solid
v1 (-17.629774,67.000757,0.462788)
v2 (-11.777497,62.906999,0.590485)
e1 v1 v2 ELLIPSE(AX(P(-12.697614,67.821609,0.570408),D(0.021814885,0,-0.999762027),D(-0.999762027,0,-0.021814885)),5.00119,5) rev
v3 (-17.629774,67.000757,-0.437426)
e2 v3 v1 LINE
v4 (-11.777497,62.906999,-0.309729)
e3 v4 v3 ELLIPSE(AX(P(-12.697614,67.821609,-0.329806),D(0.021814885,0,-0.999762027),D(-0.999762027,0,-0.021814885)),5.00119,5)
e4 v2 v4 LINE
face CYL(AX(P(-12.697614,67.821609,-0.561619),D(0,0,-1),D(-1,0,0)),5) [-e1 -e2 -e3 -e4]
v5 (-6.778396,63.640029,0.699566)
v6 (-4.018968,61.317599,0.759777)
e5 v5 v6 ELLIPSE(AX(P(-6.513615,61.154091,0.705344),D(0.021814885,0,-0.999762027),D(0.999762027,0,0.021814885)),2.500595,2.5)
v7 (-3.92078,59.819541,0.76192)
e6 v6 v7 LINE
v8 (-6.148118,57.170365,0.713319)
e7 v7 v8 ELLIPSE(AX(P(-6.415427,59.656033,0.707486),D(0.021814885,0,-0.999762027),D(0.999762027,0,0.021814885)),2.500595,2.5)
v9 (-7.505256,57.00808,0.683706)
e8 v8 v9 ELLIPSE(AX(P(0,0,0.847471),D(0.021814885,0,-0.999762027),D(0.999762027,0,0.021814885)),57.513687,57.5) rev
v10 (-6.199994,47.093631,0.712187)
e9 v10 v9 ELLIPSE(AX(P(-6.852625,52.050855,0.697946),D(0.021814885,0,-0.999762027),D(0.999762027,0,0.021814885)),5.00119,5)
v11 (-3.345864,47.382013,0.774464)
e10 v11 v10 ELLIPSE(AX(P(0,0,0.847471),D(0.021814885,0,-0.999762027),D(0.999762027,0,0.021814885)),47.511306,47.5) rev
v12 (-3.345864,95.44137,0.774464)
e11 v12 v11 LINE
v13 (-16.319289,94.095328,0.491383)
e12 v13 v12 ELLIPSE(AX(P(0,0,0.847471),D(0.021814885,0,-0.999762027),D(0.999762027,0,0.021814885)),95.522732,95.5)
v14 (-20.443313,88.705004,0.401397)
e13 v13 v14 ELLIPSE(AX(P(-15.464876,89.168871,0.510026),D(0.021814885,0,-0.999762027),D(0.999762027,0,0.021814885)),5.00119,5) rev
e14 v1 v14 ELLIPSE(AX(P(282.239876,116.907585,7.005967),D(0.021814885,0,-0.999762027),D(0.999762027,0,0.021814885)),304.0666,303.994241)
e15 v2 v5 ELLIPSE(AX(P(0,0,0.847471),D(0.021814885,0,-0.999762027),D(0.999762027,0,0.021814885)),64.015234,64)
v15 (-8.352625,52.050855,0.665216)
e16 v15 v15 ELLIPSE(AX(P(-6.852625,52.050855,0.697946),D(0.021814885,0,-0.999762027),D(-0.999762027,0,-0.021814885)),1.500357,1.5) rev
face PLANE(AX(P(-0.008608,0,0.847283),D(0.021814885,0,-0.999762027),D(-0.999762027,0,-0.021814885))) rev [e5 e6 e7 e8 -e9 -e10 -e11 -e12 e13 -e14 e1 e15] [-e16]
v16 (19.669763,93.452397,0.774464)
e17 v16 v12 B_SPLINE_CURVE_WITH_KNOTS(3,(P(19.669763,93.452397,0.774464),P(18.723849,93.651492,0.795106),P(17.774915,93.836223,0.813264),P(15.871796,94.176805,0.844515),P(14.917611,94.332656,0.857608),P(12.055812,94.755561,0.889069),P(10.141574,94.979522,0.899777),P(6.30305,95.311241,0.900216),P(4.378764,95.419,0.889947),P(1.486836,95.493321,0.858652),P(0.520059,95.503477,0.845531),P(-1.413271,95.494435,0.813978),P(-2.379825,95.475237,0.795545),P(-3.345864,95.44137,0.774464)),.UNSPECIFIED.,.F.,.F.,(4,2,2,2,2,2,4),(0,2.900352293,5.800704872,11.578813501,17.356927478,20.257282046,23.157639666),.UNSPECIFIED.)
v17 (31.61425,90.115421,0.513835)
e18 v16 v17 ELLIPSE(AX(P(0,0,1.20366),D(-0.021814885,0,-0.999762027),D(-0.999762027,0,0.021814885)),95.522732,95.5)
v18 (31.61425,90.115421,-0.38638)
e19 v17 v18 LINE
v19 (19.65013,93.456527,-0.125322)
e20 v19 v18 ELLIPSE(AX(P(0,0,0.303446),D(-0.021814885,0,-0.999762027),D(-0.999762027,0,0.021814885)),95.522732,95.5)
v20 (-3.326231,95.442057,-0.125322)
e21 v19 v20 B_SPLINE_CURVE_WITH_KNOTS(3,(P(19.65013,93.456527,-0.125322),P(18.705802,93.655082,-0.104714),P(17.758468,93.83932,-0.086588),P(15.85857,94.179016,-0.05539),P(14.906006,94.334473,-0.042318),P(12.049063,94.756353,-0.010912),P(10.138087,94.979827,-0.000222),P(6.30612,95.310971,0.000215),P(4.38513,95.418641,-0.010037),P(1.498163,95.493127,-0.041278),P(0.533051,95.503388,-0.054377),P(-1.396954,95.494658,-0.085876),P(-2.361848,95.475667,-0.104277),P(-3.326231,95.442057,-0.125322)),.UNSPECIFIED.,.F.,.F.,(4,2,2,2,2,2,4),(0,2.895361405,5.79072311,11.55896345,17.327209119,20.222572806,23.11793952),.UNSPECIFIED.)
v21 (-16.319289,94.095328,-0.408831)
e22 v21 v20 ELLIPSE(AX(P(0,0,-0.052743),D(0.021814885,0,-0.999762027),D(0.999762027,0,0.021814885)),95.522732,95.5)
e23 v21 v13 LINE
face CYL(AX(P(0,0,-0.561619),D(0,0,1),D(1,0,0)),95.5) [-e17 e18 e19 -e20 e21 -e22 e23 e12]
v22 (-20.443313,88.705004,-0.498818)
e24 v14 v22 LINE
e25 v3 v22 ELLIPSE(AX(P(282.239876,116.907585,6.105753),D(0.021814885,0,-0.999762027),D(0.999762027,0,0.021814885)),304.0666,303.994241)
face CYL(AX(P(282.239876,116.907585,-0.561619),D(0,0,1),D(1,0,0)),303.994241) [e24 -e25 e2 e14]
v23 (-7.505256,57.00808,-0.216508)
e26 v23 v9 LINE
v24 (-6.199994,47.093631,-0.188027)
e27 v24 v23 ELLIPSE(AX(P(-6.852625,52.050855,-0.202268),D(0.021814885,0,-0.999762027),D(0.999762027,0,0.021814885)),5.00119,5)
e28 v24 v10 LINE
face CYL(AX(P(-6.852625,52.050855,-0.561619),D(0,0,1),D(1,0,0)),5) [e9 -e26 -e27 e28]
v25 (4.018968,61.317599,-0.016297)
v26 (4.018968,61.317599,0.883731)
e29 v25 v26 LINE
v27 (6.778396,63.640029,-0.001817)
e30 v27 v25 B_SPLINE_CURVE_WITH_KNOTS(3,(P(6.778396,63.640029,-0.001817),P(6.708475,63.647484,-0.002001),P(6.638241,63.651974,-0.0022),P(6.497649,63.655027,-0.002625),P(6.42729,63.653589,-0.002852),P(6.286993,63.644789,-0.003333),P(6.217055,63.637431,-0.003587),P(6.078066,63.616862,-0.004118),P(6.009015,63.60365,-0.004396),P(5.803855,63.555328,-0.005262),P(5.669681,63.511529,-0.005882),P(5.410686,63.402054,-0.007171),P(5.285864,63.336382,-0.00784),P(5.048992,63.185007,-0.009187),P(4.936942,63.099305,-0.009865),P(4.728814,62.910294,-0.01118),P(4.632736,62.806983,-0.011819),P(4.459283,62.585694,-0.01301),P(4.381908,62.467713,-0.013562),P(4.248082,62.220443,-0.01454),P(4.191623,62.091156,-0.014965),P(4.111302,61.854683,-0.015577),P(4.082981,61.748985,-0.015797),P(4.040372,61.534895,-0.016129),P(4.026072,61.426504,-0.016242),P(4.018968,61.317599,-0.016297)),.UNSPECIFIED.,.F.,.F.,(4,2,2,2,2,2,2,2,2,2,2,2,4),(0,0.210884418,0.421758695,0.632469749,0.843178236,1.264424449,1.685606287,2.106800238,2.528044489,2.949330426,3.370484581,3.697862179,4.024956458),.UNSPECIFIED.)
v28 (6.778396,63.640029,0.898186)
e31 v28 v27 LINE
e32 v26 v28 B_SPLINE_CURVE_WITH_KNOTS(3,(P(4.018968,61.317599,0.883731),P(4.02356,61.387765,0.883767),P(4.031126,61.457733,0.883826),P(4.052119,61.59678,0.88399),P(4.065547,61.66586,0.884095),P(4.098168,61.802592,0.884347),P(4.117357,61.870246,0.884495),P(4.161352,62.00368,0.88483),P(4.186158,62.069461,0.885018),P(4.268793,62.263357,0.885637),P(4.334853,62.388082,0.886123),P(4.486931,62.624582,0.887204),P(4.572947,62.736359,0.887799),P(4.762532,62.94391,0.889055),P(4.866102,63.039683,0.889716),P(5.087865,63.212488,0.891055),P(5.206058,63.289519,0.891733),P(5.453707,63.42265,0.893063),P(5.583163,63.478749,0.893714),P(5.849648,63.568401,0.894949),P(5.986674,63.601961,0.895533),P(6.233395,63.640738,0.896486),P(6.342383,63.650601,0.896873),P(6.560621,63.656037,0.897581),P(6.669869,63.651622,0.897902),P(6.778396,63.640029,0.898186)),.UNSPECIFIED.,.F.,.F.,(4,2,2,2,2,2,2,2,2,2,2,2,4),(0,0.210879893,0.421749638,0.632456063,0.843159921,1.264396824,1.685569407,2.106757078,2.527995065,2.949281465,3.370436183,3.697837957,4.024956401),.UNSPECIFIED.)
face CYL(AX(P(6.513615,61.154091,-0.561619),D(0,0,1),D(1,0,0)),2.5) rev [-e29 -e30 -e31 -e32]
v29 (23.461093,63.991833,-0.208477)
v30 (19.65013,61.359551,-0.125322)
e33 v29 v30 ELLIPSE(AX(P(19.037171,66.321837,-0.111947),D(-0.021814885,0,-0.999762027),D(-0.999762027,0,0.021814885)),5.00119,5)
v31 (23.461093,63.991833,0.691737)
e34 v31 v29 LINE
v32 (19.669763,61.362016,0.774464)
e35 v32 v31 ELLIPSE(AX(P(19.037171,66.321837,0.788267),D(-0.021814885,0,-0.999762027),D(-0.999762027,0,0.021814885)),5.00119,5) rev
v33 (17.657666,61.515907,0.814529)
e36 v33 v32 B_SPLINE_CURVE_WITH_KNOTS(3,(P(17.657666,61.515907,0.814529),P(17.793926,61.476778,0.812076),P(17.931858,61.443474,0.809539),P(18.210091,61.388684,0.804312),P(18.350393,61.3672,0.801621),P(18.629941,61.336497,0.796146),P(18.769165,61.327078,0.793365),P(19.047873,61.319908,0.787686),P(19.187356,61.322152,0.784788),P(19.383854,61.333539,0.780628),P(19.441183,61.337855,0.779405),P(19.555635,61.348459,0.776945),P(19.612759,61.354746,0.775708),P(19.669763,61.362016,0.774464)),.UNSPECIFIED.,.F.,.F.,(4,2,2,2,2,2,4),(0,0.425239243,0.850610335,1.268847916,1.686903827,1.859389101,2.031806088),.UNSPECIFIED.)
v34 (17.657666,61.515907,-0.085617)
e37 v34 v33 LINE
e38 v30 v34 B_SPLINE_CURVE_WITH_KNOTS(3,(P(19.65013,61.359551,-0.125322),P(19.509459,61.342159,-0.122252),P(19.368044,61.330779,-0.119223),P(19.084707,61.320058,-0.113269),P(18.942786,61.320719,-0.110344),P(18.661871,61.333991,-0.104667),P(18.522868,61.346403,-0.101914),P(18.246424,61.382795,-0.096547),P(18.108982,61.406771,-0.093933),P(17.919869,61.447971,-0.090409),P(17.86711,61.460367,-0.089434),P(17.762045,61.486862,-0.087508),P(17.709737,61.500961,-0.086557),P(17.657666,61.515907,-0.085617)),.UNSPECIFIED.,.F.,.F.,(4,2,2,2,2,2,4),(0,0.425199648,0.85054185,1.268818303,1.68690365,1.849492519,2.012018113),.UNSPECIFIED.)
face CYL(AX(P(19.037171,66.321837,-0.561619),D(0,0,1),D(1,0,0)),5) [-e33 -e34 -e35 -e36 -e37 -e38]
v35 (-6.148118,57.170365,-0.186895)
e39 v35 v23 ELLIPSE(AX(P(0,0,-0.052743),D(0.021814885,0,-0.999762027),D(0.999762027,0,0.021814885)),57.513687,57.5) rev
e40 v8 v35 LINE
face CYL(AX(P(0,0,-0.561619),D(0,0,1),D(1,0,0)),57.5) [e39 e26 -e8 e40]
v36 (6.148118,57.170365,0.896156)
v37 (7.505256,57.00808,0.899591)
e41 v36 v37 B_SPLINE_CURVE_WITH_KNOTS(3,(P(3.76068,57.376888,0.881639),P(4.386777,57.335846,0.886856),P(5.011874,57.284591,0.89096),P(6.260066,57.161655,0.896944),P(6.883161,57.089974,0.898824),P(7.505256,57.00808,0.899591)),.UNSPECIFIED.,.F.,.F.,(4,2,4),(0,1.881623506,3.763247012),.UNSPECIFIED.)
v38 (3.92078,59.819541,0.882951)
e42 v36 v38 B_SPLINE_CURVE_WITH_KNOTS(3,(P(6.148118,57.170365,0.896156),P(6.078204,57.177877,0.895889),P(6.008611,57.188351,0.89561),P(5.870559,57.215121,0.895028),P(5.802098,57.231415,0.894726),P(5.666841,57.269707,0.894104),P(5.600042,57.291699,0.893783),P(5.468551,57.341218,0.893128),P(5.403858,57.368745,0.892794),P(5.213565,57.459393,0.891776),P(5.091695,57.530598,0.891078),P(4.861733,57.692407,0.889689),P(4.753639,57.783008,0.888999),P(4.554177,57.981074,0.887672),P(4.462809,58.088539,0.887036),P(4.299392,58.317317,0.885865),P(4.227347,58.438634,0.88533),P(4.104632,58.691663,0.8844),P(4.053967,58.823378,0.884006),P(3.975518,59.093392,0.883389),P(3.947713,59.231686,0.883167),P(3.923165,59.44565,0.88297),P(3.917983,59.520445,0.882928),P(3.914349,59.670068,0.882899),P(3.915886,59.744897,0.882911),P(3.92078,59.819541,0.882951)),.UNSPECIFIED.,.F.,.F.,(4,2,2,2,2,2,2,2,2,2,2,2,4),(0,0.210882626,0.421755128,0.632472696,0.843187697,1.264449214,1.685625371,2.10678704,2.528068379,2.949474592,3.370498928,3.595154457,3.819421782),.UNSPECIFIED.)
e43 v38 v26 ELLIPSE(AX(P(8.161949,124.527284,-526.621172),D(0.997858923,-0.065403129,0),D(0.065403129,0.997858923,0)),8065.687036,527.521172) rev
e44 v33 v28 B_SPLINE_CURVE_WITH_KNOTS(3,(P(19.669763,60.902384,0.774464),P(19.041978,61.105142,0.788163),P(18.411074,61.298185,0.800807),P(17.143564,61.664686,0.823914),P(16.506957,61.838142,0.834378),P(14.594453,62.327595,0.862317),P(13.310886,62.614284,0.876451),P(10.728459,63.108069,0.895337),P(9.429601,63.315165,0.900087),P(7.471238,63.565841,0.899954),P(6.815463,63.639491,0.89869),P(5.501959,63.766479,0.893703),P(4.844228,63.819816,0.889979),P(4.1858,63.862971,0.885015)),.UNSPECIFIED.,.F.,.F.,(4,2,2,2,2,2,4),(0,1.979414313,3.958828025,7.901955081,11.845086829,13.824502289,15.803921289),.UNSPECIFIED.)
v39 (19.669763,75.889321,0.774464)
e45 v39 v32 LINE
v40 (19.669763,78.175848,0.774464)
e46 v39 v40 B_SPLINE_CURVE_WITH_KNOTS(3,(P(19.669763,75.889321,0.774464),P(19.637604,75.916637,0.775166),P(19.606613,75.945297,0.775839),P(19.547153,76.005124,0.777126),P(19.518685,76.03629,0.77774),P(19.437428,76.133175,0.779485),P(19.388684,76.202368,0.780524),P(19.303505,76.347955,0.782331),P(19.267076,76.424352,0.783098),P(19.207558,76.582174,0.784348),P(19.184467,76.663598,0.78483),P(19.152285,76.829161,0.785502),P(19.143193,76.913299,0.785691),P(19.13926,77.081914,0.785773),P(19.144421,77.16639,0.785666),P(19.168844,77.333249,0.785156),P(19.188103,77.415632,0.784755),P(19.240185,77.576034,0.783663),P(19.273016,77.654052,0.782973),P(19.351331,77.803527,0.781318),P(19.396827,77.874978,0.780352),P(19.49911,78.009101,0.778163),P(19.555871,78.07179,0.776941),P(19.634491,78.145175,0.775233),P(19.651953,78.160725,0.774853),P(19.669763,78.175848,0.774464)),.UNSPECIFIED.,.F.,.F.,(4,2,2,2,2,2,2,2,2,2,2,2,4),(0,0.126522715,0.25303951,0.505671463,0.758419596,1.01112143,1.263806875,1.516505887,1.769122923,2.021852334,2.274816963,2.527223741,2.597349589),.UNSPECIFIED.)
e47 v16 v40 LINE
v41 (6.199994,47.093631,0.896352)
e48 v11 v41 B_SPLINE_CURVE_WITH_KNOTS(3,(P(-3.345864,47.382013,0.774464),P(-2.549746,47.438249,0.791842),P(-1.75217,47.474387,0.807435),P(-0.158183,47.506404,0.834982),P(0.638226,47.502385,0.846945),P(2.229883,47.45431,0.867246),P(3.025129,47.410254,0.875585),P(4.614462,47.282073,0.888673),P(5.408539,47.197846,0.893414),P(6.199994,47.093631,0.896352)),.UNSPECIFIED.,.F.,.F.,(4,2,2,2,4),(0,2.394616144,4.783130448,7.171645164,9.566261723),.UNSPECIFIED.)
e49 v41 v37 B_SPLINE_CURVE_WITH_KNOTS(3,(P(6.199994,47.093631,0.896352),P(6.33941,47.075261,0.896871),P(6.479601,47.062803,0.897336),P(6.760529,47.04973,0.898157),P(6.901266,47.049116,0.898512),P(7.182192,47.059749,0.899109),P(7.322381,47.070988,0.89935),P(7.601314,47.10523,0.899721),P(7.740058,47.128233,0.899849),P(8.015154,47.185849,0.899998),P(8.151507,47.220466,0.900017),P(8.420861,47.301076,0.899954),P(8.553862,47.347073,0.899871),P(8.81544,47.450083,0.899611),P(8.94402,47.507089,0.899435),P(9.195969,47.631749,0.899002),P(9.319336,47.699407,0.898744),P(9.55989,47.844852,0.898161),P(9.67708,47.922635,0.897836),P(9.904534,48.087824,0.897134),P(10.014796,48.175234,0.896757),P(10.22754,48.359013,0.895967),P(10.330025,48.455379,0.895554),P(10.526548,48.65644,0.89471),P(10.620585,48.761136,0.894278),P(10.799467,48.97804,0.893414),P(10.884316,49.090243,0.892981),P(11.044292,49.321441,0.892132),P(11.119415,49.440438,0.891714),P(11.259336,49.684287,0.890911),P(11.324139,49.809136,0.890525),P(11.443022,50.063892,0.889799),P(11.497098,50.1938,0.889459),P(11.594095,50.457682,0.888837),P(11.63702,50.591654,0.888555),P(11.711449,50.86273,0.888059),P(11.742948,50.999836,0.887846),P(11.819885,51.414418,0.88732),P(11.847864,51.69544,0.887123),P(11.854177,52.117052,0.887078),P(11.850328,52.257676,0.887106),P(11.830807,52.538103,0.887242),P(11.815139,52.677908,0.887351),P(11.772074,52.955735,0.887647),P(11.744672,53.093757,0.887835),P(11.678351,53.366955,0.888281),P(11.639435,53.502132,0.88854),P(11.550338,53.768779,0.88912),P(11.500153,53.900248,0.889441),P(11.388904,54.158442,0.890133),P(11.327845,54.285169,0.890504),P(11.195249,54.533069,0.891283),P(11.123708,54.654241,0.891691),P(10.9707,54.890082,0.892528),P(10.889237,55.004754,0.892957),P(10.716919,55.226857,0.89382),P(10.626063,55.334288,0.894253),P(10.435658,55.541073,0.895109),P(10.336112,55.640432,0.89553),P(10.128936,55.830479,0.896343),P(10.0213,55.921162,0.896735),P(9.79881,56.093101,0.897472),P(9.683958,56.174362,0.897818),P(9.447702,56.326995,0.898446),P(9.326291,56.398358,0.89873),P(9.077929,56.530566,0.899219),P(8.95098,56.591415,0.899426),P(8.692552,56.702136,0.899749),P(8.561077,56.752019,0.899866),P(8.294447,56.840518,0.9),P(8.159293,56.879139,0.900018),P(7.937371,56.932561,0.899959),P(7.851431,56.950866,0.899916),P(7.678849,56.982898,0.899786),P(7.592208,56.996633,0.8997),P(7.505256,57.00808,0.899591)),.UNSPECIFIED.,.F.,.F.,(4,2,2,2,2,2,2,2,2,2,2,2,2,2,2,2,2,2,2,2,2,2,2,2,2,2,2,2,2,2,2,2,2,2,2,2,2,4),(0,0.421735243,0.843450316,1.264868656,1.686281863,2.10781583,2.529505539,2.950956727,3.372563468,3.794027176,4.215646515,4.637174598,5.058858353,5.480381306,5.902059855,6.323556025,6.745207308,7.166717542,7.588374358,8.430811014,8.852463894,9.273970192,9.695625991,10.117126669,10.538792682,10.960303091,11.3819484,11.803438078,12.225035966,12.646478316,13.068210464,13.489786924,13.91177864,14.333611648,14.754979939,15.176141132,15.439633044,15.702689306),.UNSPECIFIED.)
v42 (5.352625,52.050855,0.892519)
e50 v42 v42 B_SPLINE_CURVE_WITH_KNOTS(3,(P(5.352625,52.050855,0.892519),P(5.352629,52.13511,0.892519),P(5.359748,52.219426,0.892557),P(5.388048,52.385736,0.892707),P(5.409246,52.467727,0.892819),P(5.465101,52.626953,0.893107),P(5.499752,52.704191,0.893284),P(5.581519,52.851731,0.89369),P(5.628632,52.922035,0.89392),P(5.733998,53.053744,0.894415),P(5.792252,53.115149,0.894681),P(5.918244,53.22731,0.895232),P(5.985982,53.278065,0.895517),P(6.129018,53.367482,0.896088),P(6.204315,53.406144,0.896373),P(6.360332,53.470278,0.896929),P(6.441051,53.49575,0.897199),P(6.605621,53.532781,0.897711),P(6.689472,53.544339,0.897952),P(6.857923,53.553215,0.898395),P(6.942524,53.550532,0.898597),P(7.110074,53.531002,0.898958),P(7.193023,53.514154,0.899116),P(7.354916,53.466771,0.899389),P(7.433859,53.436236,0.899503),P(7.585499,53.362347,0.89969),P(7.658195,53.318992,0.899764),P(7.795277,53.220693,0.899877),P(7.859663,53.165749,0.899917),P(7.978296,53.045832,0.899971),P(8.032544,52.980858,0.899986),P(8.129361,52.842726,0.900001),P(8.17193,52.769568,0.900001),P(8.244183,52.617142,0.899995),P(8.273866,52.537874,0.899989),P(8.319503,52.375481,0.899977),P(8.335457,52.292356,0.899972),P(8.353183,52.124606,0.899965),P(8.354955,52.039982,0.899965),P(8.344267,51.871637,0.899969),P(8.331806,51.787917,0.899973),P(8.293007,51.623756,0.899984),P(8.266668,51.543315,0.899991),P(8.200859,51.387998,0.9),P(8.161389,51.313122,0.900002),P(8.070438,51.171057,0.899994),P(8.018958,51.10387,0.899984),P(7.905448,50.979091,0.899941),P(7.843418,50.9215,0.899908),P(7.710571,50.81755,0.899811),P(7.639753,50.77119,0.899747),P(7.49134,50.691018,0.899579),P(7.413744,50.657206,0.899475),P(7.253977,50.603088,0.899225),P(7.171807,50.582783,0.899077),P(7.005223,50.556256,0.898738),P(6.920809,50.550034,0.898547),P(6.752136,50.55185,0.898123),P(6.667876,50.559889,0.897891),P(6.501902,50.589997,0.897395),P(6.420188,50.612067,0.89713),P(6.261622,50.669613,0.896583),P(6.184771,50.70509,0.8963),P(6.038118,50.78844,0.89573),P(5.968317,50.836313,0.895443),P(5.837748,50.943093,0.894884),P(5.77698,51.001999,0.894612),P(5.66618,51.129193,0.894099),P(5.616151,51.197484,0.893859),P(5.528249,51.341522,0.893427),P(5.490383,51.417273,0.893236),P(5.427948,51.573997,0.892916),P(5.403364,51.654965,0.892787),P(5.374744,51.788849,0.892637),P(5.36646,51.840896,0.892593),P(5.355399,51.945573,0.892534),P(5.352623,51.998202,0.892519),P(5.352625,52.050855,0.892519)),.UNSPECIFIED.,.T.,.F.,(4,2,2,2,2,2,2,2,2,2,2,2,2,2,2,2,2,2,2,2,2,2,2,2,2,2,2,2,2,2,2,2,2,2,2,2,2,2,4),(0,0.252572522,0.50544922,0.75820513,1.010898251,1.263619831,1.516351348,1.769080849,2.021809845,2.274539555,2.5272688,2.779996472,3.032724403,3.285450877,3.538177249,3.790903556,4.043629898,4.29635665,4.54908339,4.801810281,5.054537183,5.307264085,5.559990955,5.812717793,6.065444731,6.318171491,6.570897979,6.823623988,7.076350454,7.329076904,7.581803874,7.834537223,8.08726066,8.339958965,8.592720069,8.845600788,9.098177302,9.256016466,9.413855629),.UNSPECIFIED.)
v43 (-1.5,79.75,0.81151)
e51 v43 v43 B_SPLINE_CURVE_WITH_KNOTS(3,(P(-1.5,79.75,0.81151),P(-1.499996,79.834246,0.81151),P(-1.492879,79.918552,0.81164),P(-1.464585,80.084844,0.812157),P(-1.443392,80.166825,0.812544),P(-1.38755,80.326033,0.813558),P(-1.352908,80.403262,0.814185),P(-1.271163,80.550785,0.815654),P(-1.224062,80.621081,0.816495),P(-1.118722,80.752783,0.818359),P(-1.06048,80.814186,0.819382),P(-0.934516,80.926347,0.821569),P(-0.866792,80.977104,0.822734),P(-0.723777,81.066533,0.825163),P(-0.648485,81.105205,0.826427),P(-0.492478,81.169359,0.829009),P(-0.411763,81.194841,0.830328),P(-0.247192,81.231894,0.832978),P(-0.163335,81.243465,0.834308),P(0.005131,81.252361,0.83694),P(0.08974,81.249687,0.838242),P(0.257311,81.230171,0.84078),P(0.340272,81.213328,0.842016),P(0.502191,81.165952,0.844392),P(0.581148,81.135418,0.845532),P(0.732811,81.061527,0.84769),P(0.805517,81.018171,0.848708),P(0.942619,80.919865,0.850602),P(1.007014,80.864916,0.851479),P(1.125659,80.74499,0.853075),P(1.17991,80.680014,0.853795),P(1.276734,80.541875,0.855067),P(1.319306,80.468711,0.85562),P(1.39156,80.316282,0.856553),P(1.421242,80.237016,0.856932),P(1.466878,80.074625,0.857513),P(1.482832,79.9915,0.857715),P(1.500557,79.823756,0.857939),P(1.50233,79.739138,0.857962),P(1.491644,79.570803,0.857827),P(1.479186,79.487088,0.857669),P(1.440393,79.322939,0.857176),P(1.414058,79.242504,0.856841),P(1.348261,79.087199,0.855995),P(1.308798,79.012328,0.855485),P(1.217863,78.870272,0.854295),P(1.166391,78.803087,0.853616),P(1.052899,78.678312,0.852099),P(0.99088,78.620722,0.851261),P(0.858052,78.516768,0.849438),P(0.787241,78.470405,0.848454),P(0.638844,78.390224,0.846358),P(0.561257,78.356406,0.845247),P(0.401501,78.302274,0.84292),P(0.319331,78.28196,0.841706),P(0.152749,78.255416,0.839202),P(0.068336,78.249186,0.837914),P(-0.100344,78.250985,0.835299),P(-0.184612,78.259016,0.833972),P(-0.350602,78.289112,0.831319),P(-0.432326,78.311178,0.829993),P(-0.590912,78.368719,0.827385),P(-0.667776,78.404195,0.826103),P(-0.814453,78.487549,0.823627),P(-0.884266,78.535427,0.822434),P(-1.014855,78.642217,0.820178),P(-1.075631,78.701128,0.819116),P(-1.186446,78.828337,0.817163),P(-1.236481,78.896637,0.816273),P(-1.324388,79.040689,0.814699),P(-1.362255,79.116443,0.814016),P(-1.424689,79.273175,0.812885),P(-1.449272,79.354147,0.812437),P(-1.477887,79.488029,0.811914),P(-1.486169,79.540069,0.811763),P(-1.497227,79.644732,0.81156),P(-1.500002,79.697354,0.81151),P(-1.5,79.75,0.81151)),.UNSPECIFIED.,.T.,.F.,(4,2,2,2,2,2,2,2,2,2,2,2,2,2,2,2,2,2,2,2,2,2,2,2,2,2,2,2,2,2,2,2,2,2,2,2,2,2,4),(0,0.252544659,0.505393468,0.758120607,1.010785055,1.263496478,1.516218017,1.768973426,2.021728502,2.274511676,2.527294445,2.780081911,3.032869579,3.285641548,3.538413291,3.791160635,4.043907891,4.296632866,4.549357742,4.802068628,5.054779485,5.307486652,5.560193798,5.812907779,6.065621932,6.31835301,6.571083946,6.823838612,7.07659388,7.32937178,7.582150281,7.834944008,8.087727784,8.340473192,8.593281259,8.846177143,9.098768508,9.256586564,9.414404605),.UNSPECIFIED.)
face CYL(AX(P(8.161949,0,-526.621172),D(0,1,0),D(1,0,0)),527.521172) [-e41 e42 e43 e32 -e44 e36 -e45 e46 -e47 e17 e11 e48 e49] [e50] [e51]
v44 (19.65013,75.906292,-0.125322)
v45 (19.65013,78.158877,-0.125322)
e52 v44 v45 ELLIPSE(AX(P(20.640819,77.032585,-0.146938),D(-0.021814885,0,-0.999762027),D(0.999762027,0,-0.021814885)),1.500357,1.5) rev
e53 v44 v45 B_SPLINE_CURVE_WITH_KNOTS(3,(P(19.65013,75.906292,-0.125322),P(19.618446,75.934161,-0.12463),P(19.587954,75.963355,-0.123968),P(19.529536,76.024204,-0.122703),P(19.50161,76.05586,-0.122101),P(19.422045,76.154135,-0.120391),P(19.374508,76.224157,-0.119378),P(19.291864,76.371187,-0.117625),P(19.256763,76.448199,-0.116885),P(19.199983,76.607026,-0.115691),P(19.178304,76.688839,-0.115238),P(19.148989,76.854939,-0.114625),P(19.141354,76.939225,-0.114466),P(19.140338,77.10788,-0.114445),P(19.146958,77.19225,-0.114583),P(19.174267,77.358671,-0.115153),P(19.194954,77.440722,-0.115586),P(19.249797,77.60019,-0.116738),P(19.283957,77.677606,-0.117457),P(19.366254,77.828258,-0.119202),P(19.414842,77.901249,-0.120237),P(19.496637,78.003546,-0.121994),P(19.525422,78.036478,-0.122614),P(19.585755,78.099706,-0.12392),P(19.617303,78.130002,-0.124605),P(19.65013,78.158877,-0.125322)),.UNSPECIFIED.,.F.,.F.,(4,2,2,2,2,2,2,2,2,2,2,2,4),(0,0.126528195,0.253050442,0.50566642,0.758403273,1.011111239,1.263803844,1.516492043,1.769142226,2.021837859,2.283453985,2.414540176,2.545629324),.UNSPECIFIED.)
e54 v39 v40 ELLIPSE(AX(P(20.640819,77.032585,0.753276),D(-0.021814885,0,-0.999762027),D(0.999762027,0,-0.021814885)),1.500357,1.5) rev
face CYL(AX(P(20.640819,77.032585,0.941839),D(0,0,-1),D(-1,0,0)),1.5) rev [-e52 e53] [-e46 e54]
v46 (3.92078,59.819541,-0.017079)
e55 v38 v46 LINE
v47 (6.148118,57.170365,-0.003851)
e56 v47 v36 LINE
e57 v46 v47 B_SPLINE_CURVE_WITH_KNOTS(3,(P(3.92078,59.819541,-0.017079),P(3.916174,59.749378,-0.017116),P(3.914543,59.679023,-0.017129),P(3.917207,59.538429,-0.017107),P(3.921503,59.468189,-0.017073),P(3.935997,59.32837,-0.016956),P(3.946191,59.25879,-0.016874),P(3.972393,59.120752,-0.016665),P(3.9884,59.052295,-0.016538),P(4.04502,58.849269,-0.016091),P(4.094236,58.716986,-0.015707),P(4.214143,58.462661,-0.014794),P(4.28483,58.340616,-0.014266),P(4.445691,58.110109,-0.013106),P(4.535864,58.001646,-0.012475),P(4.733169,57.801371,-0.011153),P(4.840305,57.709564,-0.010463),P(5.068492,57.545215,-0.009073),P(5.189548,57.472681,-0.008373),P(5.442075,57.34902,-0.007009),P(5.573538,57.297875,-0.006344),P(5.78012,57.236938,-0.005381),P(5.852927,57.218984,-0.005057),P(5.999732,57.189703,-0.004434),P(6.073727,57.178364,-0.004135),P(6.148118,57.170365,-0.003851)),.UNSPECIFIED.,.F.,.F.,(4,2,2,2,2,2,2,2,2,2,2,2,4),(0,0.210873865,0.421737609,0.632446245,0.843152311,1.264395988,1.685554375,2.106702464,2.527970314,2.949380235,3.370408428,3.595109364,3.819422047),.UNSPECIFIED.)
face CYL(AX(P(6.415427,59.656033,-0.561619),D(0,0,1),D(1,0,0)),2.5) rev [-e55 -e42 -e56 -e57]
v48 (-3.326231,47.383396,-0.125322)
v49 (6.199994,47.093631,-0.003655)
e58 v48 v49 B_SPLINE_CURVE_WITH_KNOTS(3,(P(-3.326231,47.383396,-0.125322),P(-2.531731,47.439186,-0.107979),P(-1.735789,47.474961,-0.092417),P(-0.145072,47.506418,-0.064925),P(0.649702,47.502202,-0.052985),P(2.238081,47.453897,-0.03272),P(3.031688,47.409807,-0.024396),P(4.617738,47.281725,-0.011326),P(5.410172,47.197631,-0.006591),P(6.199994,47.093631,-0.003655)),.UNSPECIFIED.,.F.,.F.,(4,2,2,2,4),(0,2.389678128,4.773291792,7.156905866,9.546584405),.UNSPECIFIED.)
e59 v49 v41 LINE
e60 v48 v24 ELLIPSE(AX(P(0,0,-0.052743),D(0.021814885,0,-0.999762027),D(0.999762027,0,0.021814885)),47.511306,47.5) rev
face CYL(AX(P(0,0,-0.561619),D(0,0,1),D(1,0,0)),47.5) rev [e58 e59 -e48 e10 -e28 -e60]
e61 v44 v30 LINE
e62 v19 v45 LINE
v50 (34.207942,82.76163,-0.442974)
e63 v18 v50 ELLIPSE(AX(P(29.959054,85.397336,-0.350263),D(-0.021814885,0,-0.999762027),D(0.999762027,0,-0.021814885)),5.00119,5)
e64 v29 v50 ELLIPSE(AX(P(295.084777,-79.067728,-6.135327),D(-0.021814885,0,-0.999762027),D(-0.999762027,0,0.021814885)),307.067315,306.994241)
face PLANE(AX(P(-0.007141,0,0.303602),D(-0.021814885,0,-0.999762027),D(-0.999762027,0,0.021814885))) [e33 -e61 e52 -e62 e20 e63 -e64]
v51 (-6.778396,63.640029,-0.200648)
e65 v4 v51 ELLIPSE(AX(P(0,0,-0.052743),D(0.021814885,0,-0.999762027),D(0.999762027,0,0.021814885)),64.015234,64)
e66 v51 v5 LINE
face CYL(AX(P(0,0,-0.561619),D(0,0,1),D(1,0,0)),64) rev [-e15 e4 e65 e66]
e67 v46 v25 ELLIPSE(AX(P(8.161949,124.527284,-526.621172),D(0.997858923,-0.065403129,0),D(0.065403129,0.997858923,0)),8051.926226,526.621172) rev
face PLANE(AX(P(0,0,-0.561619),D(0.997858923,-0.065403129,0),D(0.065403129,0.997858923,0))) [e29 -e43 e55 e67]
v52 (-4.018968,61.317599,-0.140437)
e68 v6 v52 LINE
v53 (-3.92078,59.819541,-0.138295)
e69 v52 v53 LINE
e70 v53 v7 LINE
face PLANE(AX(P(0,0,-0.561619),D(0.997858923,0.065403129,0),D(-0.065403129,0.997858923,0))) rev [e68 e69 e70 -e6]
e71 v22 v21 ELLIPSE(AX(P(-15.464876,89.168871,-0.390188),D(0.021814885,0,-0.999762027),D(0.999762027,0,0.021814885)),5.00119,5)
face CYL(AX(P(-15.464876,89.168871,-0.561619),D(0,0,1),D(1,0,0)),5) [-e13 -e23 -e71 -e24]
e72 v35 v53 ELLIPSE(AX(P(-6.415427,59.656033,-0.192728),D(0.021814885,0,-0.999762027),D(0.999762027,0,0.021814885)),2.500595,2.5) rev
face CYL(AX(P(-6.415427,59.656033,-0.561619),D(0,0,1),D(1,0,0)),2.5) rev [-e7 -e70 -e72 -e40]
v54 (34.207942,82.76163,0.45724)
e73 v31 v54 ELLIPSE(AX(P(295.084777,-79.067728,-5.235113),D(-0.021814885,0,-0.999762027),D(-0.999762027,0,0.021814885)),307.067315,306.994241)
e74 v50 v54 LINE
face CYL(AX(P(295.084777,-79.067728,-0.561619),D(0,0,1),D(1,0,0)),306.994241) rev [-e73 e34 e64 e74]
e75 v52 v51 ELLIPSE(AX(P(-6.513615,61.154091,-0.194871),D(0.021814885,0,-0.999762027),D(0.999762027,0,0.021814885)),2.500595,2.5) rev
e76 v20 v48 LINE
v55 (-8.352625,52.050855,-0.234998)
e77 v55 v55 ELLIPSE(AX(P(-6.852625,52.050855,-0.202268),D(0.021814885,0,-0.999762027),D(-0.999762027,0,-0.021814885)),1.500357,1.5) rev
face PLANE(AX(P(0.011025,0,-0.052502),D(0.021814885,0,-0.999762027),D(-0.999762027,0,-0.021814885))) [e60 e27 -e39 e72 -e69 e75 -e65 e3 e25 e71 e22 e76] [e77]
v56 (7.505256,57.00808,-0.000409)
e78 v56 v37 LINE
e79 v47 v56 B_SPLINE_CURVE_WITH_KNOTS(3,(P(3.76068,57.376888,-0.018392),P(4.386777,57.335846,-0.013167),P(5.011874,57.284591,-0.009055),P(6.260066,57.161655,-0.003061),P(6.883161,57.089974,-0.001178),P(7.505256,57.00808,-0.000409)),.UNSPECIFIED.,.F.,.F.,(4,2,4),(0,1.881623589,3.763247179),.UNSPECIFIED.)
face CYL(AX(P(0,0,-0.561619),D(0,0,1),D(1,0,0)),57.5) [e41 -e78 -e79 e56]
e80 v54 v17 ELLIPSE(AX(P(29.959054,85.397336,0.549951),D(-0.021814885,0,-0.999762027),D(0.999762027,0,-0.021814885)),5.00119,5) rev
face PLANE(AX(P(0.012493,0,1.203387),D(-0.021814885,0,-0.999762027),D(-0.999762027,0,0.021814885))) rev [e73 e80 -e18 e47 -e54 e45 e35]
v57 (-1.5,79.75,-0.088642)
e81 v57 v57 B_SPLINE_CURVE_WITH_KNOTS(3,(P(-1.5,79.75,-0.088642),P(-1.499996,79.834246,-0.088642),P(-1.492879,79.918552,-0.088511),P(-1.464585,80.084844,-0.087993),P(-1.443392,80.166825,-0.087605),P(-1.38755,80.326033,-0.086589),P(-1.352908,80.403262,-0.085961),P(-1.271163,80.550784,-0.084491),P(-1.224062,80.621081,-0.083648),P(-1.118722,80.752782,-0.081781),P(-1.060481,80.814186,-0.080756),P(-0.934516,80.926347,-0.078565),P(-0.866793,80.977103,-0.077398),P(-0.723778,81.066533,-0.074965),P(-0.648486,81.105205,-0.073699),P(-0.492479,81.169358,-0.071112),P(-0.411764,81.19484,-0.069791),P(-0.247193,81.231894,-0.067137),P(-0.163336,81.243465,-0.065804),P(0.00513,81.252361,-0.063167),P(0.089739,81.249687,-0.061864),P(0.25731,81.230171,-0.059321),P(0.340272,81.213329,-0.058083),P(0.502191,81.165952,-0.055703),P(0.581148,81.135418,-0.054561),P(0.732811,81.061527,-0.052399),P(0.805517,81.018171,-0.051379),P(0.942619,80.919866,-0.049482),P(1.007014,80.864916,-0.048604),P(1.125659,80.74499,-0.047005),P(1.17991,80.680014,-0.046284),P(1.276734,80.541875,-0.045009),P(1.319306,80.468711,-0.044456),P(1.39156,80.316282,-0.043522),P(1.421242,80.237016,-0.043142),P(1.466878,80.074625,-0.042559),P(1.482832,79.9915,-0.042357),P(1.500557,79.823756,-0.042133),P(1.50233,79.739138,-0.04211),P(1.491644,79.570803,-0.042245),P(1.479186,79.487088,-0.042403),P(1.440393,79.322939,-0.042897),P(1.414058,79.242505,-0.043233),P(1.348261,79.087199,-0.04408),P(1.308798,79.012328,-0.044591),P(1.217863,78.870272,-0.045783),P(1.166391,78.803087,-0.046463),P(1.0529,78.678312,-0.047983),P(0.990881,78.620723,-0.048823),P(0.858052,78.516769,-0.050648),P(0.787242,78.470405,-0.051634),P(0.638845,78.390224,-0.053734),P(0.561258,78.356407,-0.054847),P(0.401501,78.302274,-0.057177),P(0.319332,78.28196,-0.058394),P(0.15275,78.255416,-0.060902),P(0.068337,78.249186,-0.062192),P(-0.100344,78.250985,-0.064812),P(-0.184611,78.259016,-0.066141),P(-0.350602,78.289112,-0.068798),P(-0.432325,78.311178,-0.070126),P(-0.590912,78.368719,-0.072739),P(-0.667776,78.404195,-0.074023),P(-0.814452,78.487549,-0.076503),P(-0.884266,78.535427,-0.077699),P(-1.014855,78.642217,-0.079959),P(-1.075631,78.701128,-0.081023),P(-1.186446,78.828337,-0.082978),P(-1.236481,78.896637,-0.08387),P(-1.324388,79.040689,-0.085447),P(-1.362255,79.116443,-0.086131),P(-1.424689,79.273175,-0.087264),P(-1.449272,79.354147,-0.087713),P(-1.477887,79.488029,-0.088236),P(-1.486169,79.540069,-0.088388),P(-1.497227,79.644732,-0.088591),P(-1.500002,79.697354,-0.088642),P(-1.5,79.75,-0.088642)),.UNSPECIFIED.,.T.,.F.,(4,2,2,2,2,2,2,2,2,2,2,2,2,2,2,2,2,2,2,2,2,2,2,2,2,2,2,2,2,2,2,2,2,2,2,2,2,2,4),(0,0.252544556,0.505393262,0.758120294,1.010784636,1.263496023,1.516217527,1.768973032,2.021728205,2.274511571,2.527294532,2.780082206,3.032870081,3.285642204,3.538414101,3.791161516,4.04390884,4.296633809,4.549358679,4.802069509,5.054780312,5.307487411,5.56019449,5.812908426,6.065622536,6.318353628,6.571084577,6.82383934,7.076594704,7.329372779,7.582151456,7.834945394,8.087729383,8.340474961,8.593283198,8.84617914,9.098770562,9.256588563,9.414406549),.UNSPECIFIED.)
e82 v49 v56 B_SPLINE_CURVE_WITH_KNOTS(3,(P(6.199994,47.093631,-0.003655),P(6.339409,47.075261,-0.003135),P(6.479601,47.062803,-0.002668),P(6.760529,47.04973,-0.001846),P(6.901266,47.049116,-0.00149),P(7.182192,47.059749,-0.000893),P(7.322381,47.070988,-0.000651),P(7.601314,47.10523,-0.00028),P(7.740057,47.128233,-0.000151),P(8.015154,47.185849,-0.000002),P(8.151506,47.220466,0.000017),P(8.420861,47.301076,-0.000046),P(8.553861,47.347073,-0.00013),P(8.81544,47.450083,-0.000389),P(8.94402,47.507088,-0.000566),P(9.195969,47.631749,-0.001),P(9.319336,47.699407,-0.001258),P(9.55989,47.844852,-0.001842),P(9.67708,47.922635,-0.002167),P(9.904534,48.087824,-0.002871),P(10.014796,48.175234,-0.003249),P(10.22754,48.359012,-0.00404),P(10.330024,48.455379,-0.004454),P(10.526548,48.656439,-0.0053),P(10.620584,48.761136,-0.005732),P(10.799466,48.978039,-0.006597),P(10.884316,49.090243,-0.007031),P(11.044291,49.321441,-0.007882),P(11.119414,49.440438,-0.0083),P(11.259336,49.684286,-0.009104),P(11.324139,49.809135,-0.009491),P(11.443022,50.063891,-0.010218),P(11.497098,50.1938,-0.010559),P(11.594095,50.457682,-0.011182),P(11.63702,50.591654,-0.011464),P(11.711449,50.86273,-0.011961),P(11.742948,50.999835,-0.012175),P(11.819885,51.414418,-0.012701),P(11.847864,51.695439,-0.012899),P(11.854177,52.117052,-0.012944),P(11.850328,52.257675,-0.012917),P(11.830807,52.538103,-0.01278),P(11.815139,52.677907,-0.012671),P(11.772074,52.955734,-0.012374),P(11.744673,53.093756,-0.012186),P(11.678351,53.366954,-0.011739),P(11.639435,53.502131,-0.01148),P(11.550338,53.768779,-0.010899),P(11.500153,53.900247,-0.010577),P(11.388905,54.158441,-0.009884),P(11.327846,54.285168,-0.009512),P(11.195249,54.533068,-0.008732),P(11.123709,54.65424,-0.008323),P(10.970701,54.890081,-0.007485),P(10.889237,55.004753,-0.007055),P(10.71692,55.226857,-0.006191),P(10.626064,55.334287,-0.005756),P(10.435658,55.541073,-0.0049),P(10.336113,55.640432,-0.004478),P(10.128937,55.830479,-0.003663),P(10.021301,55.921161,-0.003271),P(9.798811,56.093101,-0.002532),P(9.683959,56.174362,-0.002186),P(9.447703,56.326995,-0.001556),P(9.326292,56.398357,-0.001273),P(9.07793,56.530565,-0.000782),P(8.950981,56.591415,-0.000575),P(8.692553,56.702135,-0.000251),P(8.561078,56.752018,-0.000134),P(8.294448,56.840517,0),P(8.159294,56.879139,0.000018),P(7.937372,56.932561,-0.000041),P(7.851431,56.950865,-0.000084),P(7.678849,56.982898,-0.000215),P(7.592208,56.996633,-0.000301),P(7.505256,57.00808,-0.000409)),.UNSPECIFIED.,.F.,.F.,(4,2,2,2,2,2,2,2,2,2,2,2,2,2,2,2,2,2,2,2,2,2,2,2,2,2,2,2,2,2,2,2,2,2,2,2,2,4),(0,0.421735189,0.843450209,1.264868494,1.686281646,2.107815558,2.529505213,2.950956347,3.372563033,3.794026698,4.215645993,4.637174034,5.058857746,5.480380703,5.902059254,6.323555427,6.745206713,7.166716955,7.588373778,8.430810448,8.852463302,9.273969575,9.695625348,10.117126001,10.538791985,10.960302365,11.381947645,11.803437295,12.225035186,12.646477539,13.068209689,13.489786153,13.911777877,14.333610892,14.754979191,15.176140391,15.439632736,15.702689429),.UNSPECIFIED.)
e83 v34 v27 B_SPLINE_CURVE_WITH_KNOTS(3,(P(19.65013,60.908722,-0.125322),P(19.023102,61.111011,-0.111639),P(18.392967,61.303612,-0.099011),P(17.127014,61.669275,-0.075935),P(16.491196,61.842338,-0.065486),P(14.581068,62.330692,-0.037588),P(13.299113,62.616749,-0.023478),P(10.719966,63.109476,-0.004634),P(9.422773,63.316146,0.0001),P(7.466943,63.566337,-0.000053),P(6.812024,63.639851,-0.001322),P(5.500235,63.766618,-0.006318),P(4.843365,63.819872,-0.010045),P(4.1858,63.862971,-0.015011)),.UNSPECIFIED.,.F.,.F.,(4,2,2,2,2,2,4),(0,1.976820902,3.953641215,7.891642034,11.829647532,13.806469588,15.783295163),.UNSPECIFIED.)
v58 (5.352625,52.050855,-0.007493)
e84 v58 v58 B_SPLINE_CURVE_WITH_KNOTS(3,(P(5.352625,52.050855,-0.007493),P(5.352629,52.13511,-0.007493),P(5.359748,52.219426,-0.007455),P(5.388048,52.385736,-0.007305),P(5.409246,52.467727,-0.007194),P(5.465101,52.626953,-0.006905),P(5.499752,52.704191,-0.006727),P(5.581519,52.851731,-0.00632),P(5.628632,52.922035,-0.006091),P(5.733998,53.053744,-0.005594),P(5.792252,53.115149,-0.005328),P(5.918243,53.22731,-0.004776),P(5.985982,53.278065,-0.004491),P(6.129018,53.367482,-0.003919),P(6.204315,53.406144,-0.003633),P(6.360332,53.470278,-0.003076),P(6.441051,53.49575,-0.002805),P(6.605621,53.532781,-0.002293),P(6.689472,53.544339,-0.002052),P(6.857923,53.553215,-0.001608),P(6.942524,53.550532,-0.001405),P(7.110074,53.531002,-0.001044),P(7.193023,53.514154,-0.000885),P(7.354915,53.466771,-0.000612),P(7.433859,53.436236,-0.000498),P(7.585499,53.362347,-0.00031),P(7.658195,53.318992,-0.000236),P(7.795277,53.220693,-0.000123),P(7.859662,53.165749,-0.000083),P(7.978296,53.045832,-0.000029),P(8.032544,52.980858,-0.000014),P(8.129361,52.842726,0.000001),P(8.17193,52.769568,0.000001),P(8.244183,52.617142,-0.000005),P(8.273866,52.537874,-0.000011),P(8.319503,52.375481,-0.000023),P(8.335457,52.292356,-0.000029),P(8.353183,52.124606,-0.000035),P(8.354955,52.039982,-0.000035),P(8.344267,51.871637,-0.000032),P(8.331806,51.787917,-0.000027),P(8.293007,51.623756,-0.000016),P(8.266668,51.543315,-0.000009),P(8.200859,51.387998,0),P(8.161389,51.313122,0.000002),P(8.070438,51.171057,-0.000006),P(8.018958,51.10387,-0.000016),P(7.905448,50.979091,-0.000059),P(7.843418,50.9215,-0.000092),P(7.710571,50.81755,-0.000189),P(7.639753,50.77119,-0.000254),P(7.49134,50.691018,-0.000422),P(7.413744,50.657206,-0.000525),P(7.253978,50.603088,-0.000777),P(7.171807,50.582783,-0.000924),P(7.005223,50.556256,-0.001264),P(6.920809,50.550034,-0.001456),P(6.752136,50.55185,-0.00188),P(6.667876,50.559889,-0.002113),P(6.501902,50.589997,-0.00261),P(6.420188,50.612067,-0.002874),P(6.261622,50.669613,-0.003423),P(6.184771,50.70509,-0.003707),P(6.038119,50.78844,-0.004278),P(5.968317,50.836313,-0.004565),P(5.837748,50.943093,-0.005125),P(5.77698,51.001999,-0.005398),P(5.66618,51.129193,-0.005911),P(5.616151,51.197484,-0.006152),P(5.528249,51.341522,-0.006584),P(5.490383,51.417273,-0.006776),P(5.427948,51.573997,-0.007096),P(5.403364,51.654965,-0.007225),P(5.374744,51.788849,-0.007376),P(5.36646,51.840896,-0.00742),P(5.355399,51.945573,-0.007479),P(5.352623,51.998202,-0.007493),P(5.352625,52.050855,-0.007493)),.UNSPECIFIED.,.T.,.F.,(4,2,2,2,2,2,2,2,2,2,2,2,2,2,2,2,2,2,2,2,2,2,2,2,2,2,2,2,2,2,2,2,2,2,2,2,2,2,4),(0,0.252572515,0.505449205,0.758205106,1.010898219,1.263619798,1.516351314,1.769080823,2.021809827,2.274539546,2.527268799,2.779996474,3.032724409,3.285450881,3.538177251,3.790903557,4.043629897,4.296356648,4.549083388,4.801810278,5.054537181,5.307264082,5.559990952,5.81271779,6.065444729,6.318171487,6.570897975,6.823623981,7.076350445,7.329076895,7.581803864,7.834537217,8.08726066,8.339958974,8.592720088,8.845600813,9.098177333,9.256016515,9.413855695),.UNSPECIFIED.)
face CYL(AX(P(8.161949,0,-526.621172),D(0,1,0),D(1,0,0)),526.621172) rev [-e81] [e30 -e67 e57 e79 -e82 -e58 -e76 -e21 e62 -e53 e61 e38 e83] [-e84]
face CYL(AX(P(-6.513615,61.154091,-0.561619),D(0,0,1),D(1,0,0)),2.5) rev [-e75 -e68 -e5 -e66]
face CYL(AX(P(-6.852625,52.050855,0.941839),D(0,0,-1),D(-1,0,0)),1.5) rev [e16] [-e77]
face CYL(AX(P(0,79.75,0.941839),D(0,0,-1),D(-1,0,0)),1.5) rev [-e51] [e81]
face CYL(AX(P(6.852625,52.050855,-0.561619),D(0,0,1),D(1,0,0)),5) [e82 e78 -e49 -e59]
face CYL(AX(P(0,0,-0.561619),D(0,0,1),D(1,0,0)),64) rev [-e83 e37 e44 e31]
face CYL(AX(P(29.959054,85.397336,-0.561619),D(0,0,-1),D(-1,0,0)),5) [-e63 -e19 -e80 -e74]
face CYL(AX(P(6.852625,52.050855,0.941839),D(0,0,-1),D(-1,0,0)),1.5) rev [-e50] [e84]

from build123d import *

# Parameters (mm, degrees)
SKETCH9_W               = 63
SKETCH9_H               = 97
BOSS_EXTRUDE3_DEPTH     = 0.9
FLEX1_DEPTH             = 97
FLEX1_2_DEPTH           = 97
HOLES_DEPTH             = 105.800393682
HOLES_DEPTH_BACK        = 105.800393682
SKETCH10_R              = 1.5
CUT_EXTRUDE2_DEPTH      = 105.800393775
CUT_EXTRUDE2_DEPTH_BACK = 105.800393775
SKETCH11_W              = 63.006108503
SKETCH11_H              = 97
FILLET1_START           = -0.513450093
FILLET1_DEPTH           = 1.413450171
FILLET2_R               = 2.5


with BuildPart() as part:
    # Sketch9 → Boss-Extrude3 (new body)
    with BuildSketch(Plane.XY):
        with Locations((8.161949416, 48.5)):
            Rectangle(SKETCH9_W, SKETCH9_H)
    extrude(amount=BOSS_EXTRUDE3_DEPTH)

    # Flex1: read off the stored shape, not the designer's step
    # Flex1 outline → Flex1 (cut)
    with BuildSketch(Plane(origin=(0, 0, 0), x_dir=(1, 0, 0), z_dir=(0, 1, 0))):
        Polygon((39.661949416, 0), (39.657624847, 0), (39.661949416, -0.1981922), align=None)
        Polygon((-23.338050584, -0.198192162), (-23.333726016, 0), (-23.338050584, 0), align=None)
        with BuildLine():
            Line((39.661949416, -0.9), (39.661949416, -0.33823319))
            Line((39.661949416, -0.33823319), (19.669763126, -0.774464246))
            ThreePointArc((19.669763126, -0.774464246), (13.91619862, -0.868615128), (8.161949416, -0.9))
            Line((8.161949416, -0.9), (39.661949416, -0.9))
        make_face()
        with BuildLine():
            Line((-3.345864294, -0.774464246), (-23.338050584, -0.33823319))
            Line((-23.338050584, -0.33823319), (-23.338050584, -0.9))
            Line((-23.338050584, -0.9), (8.161949416, -0.9))
            ThreePointArc((8.161949416, -0.9), (2.407700212, -0.868615128), (-3.345864294, -0.774464246))
        make_face()
    extrude(amount=FLEX1_DEPTH, mode=Mode.SUBTRACT)

    # Flex1 2 outline → Flex1 2 (add)
    with BuildSketch(Plane(origin=(0, 0, 0), x_dir=(1, 0, 0), z_dir=(0, 1, 0))):
        with BuildLine():
            ThreePointArc((8.161950743, 0), (2.417518157, 0.031331319), (-3.326230898, 0.125321578))
            Line((-3.326230898, 0.125321578), (-23.321471439, 0.561619279))
            Line((-23.321471439, 0.561619279), (-23.333726016, 0))
            Line((-23.333726016, 0), (8.161950743, 0))
        make_face()
        with BuildLine():
            ThreePointArc((19.650129729, 0.125321578), (13.906382001, 0.031331334), (8.161950743, 0))
            Line((8.161950743, 0), (39.657624847, 0))
            Line((39.657624847, 0), (39.645370271, 0.561619279))
            Line((39.645370271, 0.561619279), (19.650129729, 0.125321578))
        make_face()
        Polygon((39.665003667, -0.338166546), (39.661949416, -0.1981922), (39.661949416, -0.33823319), align=None)
        Polygon((-23.338050584, -0.33823319), (-23.338050584, -0.198192162), (-23.341104836, -0.338166546), align=None)
    extrude(amount=FLEX1_2_DEPTH)

    # Sketch10 → Holes (cut, two sides: drawn at the far end of the back side and taken through both)
    with BuildSketch(Plane.XY.offset(-HOLES_DEPTH_BACK)):
        with Locations(Location((0, 79.75, 0), (0, 0, 180))):
            Circle(SKETCH10_R)
        with Locations(Location((20.640818847, 77.032584647, 0), (0, 0, 228.665080439))):
            Circle(SKETCH10_R)
        with Locations(Location((-6.852625092, 52.050855222, 0), (0, 0, 180))):
            Circle(SKETCH10_R)
        with Locations(Location((6.852625092, 52.050855222, 0), (0, 0, 180))):
            Circle(SKETCH10_R)
    extrude(amount=HOLES_DEPTH + HOLES_DEPTH_BACK, mode=Mode.SUBTRACT)

    # Sketch11 → Cut-Extrude2 (cut, two sides: drawn at the far end of the back side and taken through both)
    with BuildSketch(Plane.XY.offset(-CUT_EXTRUDE2_DEPTH_BACK)):
        with Locations((8.161949415, 48.5)):
            Rectangle(SKETCH11_W, SKETCH11_H)
        with BuildLine():
            Line((4.185800271, 63.862971087), (3.760679931, 57.376888086))
            ThreePointArc((3.760679931, 57.376888086), (5.635985569, 57.223121784), (7.505256053, 57.008079529))
            ThreePointArc((7.505256053, 57.008079529), (11.809849398, 51.398224261), (6.19999413, 47.093630915))
            ThreePointArc((6.19999413, 47.093630915), (0, 47.5), (-6.19999413, 47.093630915))
            ThreePointArc((-6.19999413, 47.093630915), (-11.809849398, 51.398224261), (-7.505256053, 57.008079529))
            ThreePointArc((-7.505256053, 57.008079529), (-5.635985569, 57.223121784), (-3.760679931, 57.376888086))
            Line((-3.760679931, 57.376888086), (-4.185800271, 63.862971087))
            ThreePointArc((-4.185800271, 63.862971087), (-10.501653038, 63.132521599), (-16.713864661, 61.779015273))
            ThreePointArc((-16.713864661, 61.779015273), (-19.180957256, 77.436335693), (-20.828588873, 93.200965046))
            ThreePointArc((-20.828588873, 93.200965046), (8.724041697, 95.100689253), (37.437803154, 87.855909847))
            ThreePointArc((37.437803154, 87.855909847), (29.127303266, 74.268784811), (21.532663784, 60.268933874))
            ThreePointArc((21.532663784, 60.268933874), (12.984187468, 62.669058361), (4.185800271, 63.862971087))
        make_face(mode=Mode.SUBTRACT)
    extrude(amount=CUT_EXTRUDE2_DEPTH + CUT_EXTRUDE2_DEPTH_BACK, mode=Mode.SUBTRACT)

    # Fillet1: read off the stored shape, not the designer's step
    # Fillet1 outline → Fillet1 (cut)
    with BuildSketch(Plane.XY.offset(FILLET1_START)):
        with BuildLine():
            ThreePointArc((-16.713864661, 61.779015273), (-14.256840633, 62.391846384), (-11.777496683, 62.906999387))
            ThreePointArc((-11.777496683, 62.906999387), (-15.563592629, 63.724516542), (-17.629773662, 67.000757185))
            ThreePointArc((-17.629773662, 67.000757185), (-17.183202347, 64.387889585), (-16.713864661, 61.779015273))
        make_face()
        with BuildLine():
            ThreePointArc((21.532663784, 60.268933874), (22.490522566, 62.133675811), (23.461092679, 63.991833391))
            ThreePointArc((23.461092679, 63.991833391), (20.999228882, 61.722888632), (17.657666024, 61.515907135))
            ThreePointArc((17.657666024, 61.515907135), (19.605081566, 60.923236756), (21.532663784, 60.268933874))
        make_face()
        with BuildLine():
            ThreePointArc((37.437803154, 87.855909847), (34.544505688, 89.033292238), (31.614250404, 90.115421385))
            ThreePointArc((31.614250404, 90.115421385), (34.674360622, 87.060431172), (34.20794214, 82.761629764))
            ThreePointArc((34.20794214, 82.761629764), (35.810360655, 85.316702623), (37.437803154, 87.855909847))
        make_face()
        with BuildLine():
            ThreePointArc((-20.828588873, 93.200965046), (-20.644293019, 90.952269753), (-20.443312617, 88.705004224))
            ThreePointArc((-20.443312617, 88.705004224), (-19.435950656, 92.207056404), (-16.319289437, 94.095328217))
            ThreePointArc((-16.319289437, 94.095328217), (-18.579321492, 93.675283895), (-20.828588873, 93.200965046))
        make_face()
    extrude(amount=FILLET1_DEPTH, mode=Mode.SUBTRACT)

    # Fillet2
    fillet2_edges = [part.edges().sort_by_distance(p)[0] for p in [
        (3.760679931, 57.376888086, 0.431623426),
        (-3.760679931, 57.376888086, 0.315305823),
        (4.185800271, 63.862971087, 0.435002027),
        (-4.185800271, 63.862971087, 0.306029665),
    ]]
    fillet(fillet2_edges, radius=FILLET2_R)


solid = part.part
